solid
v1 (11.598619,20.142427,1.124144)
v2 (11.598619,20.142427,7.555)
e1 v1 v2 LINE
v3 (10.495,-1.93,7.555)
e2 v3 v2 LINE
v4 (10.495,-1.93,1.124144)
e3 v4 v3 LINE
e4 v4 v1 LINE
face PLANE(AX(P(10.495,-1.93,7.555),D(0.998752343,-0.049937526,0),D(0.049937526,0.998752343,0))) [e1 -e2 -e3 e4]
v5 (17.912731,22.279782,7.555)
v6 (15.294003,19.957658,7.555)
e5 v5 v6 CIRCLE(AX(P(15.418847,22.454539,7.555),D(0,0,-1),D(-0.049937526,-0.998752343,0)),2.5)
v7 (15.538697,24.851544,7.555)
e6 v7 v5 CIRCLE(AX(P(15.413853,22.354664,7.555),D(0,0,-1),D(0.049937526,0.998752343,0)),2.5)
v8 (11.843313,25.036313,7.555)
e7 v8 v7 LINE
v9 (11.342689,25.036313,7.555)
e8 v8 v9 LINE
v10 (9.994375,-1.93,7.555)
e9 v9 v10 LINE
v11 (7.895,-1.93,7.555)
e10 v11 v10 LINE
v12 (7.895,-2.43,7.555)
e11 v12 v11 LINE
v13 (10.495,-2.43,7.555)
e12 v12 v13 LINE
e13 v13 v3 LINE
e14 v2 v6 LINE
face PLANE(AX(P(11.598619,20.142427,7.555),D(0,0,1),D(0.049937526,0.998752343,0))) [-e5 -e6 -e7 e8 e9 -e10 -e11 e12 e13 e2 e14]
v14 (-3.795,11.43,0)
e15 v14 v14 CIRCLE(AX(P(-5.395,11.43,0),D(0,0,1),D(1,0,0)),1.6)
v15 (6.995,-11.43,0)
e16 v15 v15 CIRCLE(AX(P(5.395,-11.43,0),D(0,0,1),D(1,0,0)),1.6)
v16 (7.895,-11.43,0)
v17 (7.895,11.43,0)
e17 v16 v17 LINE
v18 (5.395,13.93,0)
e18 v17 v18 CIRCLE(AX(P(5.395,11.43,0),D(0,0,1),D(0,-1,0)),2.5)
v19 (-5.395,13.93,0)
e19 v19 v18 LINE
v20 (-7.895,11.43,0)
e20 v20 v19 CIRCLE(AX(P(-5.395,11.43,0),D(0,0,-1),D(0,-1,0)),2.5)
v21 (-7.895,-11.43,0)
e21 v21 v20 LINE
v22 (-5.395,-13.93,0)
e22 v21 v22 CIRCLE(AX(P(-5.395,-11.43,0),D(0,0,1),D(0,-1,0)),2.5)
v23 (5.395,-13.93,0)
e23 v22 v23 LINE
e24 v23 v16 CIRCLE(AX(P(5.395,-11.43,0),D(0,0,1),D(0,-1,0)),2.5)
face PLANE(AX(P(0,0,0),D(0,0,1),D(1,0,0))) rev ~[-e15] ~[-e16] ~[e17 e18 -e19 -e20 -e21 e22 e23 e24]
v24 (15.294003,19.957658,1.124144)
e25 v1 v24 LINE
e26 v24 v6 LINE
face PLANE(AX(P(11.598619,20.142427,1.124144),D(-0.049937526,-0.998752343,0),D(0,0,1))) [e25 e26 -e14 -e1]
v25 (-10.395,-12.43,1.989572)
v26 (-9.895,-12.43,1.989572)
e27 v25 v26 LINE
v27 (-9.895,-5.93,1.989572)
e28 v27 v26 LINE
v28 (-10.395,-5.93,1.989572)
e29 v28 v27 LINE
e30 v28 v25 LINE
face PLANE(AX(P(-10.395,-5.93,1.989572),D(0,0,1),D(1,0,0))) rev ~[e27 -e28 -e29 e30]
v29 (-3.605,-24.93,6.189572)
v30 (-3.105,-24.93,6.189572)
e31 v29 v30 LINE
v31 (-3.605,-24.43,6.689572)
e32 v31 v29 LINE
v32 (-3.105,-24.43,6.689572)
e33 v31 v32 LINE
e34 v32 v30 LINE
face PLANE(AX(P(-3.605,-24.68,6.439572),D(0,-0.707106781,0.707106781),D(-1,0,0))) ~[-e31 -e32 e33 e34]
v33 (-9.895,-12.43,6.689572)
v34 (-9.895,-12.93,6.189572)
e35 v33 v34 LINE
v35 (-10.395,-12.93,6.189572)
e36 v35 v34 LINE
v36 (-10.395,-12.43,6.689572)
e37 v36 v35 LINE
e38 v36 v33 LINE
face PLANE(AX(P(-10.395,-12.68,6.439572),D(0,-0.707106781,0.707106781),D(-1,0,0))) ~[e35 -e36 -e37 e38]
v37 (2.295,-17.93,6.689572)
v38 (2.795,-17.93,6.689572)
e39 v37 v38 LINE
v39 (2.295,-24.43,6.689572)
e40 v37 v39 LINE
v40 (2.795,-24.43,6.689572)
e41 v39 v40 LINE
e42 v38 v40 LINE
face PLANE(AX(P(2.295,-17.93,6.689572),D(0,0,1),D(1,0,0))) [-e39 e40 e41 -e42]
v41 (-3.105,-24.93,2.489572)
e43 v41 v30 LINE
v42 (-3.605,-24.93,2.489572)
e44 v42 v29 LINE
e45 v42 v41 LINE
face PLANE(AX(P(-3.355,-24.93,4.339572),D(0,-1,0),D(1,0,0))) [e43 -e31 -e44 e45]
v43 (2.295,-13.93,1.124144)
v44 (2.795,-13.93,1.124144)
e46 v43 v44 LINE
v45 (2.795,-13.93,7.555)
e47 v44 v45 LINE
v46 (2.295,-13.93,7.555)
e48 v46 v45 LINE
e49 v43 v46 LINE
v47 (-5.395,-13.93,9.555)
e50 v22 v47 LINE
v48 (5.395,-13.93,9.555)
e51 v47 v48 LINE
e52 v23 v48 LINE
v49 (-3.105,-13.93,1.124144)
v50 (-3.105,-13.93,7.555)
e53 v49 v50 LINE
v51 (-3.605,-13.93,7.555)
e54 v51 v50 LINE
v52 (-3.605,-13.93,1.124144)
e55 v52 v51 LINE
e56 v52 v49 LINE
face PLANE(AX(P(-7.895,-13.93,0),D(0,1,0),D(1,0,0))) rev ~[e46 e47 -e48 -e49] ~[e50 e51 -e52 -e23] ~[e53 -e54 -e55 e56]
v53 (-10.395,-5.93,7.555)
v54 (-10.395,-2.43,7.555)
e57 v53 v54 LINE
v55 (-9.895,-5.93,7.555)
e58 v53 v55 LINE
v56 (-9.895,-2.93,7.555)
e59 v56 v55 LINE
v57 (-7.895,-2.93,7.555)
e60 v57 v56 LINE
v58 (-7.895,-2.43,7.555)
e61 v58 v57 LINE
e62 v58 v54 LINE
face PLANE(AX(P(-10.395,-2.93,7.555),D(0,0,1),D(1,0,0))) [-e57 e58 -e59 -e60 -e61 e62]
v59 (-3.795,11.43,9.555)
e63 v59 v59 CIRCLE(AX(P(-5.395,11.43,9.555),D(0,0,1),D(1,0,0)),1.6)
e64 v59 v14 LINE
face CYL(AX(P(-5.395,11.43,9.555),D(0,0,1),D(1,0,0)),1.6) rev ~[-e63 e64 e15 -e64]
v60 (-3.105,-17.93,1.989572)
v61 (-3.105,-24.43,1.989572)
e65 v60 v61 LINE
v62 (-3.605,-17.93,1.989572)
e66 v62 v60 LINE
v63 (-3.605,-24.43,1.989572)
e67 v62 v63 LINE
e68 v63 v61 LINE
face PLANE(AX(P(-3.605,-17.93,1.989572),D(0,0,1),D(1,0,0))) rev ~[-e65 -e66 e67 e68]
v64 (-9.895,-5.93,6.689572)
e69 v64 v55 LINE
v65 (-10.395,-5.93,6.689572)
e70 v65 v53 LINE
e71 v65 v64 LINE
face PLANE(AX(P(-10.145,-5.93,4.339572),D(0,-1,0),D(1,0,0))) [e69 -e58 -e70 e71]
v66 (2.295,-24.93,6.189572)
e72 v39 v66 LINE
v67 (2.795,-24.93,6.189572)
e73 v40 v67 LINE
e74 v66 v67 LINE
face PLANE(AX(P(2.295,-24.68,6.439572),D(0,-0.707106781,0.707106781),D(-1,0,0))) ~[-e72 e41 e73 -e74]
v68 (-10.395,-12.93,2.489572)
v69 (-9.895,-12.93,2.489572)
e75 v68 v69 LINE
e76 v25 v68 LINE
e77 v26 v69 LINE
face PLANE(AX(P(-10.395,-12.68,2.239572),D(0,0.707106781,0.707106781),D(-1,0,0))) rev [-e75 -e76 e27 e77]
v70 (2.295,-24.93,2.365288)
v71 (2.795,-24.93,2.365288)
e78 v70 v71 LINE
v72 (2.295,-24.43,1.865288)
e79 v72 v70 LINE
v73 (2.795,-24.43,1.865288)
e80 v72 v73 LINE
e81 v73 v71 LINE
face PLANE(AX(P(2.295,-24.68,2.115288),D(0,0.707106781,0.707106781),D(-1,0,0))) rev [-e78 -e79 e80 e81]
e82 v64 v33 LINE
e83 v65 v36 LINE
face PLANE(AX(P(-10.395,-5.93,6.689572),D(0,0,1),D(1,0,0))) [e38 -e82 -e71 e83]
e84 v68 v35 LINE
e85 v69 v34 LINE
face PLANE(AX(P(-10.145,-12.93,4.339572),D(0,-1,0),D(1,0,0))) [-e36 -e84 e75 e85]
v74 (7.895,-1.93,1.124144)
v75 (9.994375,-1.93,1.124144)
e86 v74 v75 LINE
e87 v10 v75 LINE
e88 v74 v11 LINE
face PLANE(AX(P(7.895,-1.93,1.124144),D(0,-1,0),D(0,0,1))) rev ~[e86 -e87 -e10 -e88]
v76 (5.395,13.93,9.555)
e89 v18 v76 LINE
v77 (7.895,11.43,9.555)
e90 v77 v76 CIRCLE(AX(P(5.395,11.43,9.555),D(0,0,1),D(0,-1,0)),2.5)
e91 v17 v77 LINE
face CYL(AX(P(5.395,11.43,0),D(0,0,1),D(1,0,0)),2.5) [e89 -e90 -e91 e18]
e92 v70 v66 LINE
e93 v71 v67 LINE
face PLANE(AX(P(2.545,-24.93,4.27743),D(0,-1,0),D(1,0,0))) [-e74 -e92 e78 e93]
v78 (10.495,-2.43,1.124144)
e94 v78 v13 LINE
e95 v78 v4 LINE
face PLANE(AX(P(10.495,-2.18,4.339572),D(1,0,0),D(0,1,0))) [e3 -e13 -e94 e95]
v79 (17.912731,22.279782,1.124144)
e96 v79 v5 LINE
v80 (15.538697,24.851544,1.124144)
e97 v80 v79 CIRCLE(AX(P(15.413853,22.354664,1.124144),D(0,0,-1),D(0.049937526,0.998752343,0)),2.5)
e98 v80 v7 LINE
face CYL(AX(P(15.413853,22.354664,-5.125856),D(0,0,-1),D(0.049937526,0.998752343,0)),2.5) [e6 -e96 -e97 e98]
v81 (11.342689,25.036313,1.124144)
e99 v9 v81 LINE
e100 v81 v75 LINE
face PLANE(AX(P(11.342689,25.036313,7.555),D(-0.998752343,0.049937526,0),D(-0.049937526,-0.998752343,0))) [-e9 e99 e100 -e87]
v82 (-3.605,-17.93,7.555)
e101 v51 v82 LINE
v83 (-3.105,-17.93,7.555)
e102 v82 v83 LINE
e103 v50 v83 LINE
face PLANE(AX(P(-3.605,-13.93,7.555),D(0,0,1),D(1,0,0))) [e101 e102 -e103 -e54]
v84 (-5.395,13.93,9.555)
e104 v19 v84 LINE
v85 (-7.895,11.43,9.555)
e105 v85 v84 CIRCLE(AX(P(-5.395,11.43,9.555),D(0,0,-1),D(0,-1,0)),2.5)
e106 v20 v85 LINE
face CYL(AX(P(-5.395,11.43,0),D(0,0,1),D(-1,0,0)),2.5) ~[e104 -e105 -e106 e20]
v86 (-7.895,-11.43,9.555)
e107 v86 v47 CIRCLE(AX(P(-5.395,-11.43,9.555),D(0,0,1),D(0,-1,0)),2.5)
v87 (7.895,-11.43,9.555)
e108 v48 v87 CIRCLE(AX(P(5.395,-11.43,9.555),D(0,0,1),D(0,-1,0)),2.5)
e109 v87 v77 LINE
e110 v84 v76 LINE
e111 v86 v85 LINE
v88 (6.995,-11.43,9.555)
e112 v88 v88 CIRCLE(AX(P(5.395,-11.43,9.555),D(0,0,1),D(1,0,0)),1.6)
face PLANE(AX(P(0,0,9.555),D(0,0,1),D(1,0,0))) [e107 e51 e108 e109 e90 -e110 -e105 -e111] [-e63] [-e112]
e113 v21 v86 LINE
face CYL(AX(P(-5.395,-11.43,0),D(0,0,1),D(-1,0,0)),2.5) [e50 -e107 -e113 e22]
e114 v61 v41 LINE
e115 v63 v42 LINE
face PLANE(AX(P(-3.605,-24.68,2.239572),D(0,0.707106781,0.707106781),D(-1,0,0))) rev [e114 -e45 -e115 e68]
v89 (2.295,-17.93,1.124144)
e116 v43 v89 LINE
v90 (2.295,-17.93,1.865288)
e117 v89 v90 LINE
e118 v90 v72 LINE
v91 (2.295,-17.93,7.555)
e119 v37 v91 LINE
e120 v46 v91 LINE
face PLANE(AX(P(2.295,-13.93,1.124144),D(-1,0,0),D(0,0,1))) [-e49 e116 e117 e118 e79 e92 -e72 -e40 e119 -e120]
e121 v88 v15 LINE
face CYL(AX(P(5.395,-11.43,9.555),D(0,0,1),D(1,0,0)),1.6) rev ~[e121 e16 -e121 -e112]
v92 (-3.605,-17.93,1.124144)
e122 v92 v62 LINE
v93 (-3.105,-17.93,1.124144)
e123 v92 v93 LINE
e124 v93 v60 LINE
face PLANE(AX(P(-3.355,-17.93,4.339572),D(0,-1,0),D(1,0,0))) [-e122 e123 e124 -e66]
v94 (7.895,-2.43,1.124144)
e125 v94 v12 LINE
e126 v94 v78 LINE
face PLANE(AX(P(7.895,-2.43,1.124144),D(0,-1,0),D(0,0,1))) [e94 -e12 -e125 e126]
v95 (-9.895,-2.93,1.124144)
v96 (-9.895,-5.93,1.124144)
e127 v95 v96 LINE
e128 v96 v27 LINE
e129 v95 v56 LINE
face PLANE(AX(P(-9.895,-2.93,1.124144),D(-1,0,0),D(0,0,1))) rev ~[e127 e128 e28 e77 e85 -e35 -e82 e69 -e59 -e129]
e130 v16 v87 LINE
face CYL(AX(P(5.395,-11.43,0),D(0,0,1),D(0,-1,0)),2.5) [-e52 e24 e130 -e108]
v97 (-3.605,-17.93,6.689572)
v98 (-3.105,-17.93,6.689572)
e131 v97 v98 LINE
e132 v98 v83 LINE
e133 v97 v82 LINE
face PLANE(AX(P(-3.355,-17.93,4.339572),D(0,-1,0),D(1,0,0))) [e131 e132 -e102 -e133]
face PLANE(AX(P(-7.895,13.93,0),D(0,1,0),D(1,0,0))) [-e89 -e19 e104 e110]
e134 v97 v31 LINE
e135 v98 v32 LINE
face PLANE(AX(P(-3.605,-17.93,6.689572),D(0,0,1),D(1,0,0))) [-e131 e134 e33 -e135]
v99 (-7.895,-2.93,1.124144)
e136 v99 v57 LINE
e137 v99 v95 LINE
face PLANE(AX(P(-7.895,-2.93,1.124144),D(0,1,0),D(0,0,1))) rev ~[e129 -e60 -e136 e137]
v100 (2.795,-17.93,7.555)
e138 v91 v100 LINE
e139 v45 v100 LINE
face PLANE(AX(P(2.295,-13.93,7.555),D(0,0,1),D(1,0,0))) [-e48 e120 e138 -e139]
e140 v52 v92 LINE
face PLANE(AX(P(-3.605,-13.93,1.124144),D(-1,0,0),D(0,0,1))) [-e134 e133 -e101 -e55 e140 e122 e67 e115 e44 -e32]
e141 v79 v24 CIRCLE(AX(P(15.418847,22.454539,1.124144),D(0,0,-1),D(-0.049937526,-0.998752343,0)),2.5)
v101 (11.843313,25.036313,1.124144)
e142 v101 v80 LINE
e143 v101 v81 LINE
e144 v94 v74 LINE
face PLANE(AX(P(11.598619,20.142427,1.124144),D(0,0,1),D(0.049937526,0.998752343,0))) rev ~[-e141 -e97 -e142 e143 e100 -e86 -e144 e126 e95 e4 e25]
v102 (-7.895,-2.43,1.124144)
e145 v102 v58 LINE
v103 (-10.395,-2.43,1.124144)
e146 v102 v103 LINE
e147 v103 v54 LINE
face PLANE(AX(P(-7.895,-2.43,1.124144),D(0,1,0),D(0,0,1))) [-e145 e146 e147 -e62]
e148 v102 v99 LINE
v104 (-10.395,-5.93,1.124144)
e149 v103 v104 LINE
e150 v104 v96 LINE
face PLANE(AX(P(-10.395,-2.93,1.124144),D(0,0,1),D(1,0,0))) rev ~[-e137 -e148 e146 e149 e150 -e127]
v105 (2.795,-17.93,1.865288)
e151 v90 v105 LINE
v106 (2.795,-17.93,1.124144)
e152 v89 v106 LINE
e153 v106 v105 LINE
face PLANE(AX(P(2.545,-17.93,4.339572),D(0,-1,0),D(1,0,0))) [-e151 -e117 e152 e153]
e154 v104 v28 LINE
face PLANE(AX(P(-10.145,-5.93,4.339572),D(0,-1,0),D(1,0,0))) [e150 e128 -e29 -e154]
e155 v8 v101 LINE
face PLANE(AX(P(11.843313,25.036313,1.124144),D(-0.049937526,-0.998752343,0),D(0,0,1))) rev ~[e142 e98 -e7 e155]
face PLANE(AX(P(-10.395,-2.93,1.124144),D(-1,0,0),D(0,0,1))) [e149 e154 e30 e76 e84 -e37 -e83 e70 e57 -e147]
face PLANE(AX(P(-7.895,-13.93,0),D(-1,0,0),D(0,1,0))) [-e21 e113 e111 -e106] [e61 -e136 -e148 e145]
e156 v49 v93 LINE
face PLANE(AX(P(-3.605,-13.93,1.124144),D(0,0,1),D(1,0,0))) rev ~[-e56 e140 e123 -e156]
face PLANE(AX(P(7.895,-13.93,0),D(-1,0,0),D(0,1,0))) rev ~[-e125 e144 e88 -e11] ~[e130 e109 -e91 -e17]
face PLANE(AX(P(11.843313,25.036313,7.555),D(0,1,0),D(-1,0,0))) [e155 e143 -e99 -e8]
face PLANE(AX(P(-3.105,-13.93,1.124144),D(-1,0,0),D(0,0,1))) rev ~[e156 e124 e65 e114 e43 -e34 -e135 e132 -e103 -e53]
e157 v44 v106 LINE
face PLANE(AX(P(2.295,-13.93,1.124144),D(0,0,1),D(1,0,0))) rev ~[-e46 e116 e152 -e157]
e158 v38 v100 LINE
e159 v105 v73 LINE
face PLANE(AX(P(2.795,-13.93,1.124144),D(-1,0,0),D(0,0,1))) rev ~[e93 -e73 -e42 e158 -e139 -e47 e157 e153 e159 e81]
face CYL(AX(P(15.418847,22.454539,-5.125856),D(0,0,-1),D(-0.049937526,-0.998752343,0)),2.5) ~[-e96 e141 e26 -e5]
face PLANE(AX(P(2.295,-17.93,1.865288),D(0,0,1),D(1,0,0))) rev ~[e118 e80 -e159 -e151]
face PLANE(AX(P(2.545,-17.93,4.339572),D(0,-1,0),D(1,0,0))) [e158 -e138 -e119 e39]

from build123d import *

# Parameters (mm, degrees)
F0_W         = 15.79
F0_H         = 27.86
F1_DEPTH     = 9.555
F2_R         = 2.5
F3_R         = 1.6
F4_DEPTH     = 25
F5_W         = 0.5
F5_H         = 6.4308560686
F6_DEPTH     = 4
F7_W         = 0.5
F7_H         = 4.7
F7_H_2       = 4.8242840722
F8_DEPTH     = 7
F9_SIZE      = 0.5
F10_W        = 0.5
F10_H        = 6.4308560686
F11_DEPTH    = 2.5
F12_W        = 0.5
F12_H        = 6.4308560686
F13_DEPTH    = 3
F14_W        = 0.5
F14_H        = 4.7
F15_DEPTH    = 7
F16_SIZE     = 0.5
F17_W        = 0.5
F17_H        = 6.4308560686
F18_DEPTH    = 2.6
F20_DEPTH    = 6.4308560686
F21_W        = 4.9
F21_H        = 6.4308560686
F22_DEPTH    = 6.2
F23_T1_DEPTH = 18.9308560686


# Not quite as in the source:
# - a fillet or chamfer that OpenCascade refuses, or shapes differently, is made with other operations: its cross-section is extruded or revolved along the edge and cut away or added


with BuildPart() as f1:
    # F0 (on Top) → F1 (new body)
    with BuildSketch(Plane.XY):
        Rectangle(F0_W, F0_H)
    extrude(amount=F1_DEPTH)

    # F2
    f2_edges = [f1.edges().sort_by_distance(p)[0] for p in [
        (-7.895, 13.93, 4.7775),
        (7.895, 13.93, 4.7775),
        (-7.895, -13.93, 4.7775),
        (7.895, -13.93, 4.7775),
    ]]
    fillet(f2_edges, radius=F2_R)

    # F3 (on face) → F4 (cut)
    with BuildSketch(Plane.XY.offset(9.555)):
        with Locations((-5.395, 11.43)):
            Circle(F3_R)
        with Locations((5.395, -11.43)):
            Circle(F3_R)
    extrude(amount=-F4_DEPTH, mode=Mode.SUBTRACT)

    # F5 (on face) → F6 (join)
    with BuildSketch(Plane.XZ.offset(13.93)):
        with Locations((-3.355, 4.3395719657)):
            Rectangle(F5_W, F5_H)
        with Locations((2.545, 4.3395719657)):
            Rectangle(F5_W, F5_H)
    extrude(amount=F6_DEPTH)

    # F7 (on face) → F8 (join)
    with BuildSketch(Plane.XZ.offset(17.93)):
        with Locations((-3.355, 4.3395719657)):
            Rectangle(F7_W, F7_H)
        with Locations((2.545, 4.2774299296)):
            Rectangle(F7_W, F7_H_2)
    extrude(amount=F8_DEPTH)

    # F9
    f9_edges = [f1.edges().sort_by_distance(p)[0] for p in [
        (-3.355, -24.93, 6.689572),
        (2.545, -24.93, 6.689572),
        (2.545, -24.93, 1.865288),
        (-3.355, -24.93, 1.989572),
    ]]
    chamfer(f9_edges, length=F9_SIZE)

    # F10 (on face) → F11 (join)
    with BuildSketch(Plane(origin=(-7.895, 0, 0), x_dir=(0, -1, 0), z_dir=(-1, 0, 0))):
        with Locations((2.68, 4.3395719657)):
            Rectangle(F10_W, F10_H)
    extrude(amount=F11_DEPTH)

    # F12 (on face) → F13 (join)
    with BuildSketch(Plane.XZ.offset(2.93)):
        with Locations((-10.145, 4.3395719657)):
            Rectangle(F12_W, F12_H)
    extrude(amount=F13_DEPTH)

    # F14 (on face) → F15 (join)
    with BuildSketch(Plane.XZ.offset(5.93)):
        with Locations((-10.145, 4.3395719657)):
            Rectangle(F14_W, F14_H)
    extrude(amount=F15_DEPTH)

    # F16
    f16_edges = [f1.edges().sort_by_distance(p)[0] for p in [
        (-10.145, -12.93, 6.689572),
        (-10.145, -12.93, 1.989572),
    ]]
    chamfer(f16_edges, length=F16_SIZE)

    # F17 (on face) → F18 (join)
    with BuildSketch(Plane.YZ.offset(7.895)):
        with Locations((-2.18, 4.3395719657)):
            Rectangle(F17_W, F17_H)
    extrude(amount=F18_DEPTH)

    # F19 (on face) → F20 (join, through all)
    with BuildSketch(Plane.XY.offset(7.555)):
        Polygon((11.3426885902, 25.0363132727), (9.9943753924, -1.93), (10.495, -1.93), (11.8433131978, 25.0363132727), align=None)
    extrude(amount=-F20_DEPTH)

    # F21 (on face) → F22 (join)
    with BuildSketch(Plane(origin=(10.5650872021, -0.528253394, 0), x_dir=(0.0499375258, 0.9987523434, 0), z_dir=(0.9987523434, -0.0499375258, 0))):
        with Locations((23.1465023109, 4.3395719657)):
            Rectangle(F21_W, F21_H)
    extrude(amount=F22_DEPTH)

    # F23: fillet of radius 2.5 on 2 edges, made by hand

    # F23_s2 → F23_t1 (cut)
    with BuildSketch(Plane.XY.offset(-5.1258560686)):
        with BuildLine():
            ThreePointArc((15.2940029919, 19.9576579442), (17.0961302855, 20.600699508), (17.9157276651, 22.3296949882))
            Line((17.9157276651, 22.3296949882), (17.7908838505, 19.8328141296))
            Line((17.7908838505, 19.8328141296), (15.2940029919, 19.9576579442))
        make_face()
        with BuildLine():
            ThreePointArc((15.5386968685, 24.8515444271), (17.2676923487, 24.0319470475), (17.9107339125, 22.2298197539))
            Line((17.9107339125, 22.2298197539), (18.0355777271, 24.7267006124))
            Line((18.0355777271, 24.7267006124), (15.5386968685, 24.8515444271))
        make_face()
    extrude(amount=F23_T1_DEPTH, mode=Mode.SUBTRACT)


solid = f1.part
